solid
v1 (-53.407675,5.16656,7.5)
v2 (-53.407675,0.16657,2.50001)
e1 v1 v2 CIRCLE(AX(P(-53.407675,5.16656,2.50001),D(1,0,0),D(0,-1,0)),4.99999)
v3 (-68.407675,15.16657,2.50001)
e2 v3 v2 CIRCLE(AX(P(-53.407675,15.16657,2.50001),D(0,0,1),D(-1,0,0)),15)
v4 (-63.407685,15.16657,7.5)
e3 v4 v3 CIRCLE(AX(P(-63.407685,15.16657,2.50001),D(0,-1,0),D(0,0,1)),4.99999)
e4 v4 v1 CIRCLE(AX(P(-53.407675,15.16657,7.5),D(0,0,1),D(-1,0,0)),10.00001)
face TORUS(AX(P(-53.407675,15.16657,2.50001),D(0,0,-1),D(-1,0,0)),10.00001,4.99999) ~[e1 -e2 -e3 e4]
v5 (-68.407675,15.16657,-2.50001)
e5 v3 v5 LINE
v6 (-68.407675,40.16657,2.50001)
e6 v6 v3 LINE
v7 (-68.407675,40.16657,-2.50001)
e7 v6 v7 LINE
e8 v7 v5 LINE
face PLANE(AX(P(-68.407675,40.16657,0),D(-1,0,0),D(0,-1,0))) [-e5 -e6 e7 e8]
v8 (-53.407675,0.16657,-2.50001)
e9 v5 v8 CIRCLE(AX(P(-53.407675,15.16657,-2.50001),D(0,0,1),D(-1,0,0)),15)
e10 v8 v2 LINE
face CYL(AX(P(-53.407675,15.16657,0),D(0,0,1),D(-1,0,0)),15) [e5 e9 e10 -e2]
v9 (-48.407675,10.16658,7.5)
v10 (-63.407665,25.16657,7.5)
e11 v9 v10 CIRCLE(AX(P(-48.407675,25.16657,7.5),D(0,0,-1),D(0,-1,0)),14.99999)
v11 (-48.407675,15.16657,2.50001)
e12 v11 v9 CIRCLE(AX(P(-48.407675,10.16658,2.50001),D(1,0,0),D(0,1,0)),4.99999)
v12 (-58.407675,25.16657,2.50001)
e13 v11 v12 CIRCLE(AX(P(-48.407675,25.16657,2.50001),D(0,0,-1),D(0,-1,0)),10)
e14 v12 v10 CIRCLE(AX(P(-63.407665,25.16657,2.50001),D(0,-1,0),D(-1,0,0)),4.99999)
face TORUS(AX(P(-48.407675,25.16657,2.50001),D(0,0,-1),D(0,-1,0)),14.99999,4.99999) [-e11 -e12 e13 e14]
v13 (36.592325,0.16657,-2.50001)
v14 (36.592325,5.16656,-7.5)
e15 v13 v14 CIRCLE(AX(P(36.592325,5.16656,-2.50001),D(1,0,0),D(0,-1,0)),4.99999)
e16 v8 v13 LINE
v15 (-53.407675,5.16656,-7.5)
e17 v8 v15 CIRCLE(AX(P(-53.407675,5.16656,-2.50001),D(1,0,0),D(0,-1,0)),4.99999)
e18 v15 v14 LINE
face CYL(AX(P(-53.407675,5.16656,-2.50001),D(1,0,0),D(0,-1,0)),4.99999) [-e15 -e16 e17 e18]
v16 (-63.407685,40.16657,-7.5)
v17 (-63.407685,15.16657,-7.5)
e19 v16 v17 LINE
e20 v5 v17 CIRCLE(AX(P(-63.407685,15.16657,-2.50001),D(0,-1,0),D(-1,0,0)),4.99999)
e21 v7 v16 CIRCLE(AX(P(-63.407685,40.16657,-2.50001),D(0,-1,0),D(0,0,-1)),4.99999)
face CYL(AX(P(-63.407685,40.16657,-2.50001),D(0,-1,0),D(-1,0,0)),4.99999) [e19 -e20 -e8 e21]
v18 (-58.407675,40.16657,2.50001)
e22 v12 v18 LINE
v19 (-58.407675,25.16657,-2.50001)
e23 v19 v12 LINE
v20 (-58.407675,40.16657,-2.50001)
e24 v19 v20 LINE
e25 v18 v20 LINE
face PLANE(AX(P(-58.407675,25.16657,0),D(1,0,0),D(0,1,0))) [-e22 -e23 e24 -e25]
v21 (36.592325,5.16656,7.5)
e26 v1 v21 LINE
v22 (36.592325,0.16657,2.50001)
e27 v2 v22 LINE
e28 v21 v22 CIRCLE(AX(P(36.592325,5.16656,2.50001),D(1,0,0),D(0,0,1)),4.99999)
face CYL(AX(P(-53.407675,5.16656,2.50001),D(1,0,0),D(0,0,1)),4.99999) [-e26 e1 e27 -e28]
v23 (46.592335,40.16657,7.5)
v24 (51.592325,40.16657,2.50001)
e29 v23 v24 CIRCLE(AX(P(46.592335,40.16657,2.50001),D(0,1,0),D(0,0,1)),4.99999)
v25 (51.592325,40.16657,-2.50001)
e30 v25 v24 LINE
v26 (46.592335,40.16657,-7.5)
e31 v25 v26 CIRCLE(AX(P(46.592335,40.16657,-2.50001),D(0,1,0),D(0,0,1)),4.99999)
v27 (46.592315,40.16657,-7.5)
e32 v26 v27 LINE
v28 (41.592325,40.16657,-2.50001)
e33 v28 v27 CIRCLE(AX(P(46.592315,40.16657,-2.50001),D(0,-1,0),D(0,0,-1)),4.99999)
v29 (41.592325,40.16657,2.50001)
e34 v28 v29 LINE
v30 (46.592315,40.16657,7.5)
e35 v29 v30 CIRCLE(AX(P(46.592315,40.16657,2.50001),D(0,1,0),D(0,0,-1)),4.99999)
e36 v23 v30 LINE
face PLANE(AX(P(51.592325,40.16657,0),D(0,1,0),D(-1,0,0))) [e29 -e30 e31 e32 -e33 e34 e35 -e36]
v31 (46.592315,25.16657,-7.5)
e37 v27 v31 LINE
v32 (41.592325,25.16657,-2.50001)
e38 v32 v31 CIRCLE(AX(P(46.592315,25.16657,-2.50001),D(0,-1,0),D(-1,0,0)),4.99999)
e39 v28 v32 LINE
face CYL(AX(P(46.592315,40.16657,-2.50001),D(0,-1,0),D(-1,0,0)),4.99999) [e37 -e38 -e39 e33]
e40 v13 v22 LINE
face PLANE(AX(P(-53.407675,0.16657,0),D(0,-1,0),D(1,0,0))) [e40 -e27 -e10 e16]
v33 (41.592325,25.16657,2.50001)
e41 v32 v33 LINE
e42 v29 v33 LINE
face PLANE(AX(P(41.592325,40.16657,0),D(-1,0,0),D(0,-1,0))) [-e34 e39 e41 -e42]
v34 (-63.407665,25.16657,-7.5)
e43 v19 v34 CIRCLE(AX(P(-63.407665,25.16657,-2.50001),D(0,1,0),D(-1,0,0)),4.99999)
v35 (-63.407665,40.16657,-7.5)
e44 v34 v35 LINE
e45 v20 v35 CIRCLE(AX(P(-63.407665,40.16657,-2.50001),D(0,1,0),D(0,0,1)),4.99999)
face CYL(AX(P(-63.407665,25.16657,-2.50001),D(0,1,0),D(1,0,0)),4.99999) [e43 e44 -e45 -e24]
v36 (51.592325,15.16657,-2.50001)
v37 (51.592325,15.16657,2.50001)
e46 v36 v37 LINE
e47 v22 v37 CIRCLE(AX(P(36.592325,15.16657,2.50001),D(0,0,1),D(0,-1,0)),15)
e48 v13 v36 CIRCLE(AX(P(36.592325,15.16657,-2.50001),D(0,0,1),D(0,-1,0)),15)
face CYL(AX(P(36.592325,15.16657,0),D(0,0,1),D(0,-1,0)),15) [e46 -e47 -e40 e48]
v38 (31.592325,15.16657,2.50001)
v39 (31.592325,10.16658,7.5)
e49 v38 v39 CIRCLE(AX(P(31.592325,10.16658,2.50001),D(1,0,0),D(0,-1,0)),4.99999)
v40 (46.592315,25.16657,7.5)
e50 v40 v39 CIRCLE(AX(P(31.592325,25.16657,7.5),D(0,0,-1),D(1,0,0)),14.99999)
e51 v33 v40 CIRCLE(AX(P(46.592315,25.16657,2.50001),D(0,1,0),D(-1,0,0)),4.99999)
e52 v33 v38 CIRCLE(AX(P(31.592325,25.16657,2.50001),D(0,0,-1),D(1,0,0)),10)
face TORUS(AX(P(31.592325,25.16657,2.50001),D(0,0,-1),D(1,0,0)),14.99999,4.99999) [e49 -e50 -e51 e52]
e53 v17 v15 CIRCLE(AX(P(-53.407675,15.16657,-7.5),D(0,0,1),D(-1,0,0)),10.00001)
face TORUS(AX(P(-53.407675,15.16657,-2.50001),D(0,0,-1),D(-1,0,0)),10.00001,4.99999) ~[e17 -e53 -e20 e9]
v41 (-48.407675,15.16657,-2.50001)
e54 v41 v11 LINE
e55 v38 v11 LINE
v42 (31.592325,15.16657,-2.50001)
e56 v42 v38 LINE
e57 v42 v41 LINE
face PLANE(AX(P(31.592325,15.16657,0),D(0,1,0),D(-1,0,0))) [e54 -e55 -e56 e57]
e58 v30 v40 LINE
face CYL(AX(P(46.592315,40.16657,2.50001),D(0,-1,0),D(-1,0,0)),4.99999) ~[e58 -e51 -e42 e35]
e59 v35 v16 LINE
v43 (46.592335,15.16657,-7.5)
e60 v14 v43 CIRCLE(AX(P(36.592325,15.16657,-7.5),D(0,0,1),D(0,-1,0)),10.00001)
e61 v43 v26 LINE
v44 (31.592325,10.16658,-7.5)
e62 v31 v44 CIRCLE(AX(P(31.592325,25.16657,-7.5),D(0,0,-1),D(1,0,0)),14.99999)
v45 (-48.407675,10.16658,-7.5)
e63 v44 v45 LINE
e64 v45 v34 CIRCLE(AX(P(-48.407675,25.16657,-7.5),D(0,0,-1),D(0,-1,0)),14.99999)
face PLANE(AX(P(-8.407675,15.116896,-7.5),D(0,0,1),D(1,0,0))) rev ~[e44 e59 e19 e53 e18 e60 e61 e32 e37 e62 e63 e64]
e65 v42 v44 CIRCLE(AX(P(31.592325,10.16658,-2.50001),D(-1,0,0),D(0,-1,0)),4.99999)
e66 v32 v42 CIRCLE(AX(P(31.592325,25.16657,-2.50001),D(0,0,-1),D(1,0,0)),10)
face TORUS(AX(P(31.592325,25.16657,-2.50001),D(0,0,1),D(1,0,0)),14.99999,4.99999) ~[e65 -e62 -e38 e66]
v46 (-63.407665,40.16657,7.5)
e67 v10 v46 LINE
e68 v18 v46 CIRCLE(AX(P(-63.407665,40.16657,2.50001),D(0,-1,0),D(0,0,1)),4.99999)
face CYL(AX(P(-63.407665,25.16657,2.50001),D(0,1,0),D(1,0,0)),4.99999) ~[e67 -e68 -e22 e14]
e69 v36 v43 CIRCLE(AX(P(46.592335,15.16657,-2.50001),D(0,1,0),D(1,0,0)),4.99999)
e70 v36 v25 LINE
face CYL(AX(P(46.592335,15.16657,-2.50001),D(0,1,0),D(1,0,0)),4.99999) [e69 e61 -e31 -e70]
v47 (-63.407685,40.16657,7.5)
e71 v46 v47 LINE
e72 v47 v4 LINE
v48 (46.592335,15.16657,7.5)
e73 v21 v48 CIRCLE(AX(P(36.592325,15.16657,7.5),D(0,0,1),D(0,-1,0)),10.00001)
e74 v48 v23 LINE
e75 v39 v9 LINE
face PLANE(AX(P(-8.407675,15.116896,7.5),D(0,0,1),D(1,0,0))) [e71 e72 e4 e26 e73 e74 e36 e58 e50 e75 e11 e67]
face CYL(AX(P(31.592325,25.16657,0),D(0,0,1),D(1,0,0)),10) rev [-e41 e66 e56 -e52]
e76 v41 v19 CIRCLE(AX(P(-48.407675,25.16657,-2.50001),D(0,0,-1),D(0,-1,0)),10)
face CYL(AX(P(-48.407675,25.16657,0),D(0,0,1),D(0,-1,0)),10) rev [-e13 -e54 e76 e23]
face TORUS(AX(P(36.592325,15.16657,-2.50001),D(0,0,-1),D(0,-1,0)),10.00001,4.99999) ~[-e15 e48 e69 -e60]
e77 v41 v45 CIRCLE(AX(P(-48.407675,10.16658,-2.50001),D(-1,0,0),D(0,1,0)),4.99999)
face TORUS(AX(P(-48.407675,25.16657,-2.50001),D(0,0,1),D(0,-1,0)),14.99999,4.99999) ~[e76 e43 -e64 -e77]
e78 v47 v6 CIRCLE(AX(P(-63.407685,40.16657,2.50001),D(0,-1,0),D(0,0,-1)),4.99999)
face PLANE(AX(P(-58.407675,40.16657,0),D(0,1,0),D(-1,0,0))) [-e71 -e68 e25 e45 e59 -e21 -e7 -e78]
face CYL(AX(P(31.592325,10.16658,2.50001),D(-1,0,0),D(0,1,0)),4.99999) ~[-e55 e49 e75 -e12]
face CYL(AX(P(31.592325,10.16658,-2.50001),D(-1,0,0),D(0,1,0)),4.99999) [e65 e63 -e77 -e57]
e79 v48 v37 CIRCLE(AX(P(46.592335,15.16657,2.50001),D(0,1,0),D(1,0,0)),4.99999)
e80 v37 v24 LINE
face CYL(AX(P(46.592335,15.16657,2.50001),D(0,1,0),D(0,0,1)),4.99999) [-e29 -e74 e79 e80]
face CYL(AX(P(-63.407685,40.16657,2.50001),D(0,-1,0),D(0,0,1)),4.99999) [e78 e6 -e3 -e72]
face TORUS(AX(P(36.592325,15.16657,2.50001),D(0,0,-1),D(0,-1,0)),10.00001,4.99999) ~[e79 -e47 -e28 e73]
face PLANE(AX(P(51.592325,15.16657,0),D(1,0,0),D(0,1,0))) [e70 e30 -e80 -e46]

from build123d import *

# Parameters (mm, degrees)
F1_DEPTH = 7.5
F2_R     = 4.99999


# Not quite as in the source:
# - a fillet or chamfer is up to 0.001 mm smaller than in the source, because OpenCascade refuses the exact size


with BuildPart() as f1:
    # F0 (on Top) → F1 (new body, symmetric)
    with BuildSketch(Plane.XY):
        with BuildLine():
            ThreePointArc((-68.4076752503, 15.1665699541), (-64.0142769681, 4.5599682363), (-53.4076752503, 0.1665699541))
            Line((-53.4076752503, 0.1665699541), (36.5923247497, 0.1665699541))
            ThreePointArc((36.5923247497, 0.1665699541), (47.1989264675, 4.5599682363), (51.5923247497, 15.1665699541))
            Line((51.5923247497, 15.1665699541), (51.5923247497, 40.1665699541))
            Line((51.5923247497, 40.1665699541), (41.5923247497, 40.1665699541))
            Line((41.5923247497, 40.1665699541), (41.5923247497, 25.1665699541))
            ThreePointArc((41.5923247497, 25.1665699541), (38.6633925615, 18.0955021423), (31.5923247497, 15.1665699541))
            Line((31.5923247497, 15.1665699541), (-48.4076752503, 15.1665699541))
            ThreePointArc((-48.4076752503, 15.1665699541), (-55.4787430622, 18.0955021423), (-58.4076752503, 25.1665699541))
            Line((-58.4076752503, 25.1665699541), (-58.4076752503, 40.1665699541))
            Line((-58.4076752503, 40.1665699541), (-68.4076752503, 40.1665699541))
            Line((-68.4076752503, 40.1665699541), (-68.4076752503, 15.1665699541))
        make_face()
    extrude(amount=F1_DEPTH, both=True)

    # F2 (radius 5 in the source; OpenCascade refuses exactly that, so slightly less here)
    f2_edges = [f1.edges().sort_by_distance(p)[0] for p in [
        (-8.407675, 15.16657, 7.5),
        (-8.407675, 0.16657, 7.5),
        (-8.407675, 0.16657, -7.5),
        (-8.407675, 15.16657, -7.5),
    ]]
    fillet(f2_edges, radius=F2_R)


solid = f1.part
